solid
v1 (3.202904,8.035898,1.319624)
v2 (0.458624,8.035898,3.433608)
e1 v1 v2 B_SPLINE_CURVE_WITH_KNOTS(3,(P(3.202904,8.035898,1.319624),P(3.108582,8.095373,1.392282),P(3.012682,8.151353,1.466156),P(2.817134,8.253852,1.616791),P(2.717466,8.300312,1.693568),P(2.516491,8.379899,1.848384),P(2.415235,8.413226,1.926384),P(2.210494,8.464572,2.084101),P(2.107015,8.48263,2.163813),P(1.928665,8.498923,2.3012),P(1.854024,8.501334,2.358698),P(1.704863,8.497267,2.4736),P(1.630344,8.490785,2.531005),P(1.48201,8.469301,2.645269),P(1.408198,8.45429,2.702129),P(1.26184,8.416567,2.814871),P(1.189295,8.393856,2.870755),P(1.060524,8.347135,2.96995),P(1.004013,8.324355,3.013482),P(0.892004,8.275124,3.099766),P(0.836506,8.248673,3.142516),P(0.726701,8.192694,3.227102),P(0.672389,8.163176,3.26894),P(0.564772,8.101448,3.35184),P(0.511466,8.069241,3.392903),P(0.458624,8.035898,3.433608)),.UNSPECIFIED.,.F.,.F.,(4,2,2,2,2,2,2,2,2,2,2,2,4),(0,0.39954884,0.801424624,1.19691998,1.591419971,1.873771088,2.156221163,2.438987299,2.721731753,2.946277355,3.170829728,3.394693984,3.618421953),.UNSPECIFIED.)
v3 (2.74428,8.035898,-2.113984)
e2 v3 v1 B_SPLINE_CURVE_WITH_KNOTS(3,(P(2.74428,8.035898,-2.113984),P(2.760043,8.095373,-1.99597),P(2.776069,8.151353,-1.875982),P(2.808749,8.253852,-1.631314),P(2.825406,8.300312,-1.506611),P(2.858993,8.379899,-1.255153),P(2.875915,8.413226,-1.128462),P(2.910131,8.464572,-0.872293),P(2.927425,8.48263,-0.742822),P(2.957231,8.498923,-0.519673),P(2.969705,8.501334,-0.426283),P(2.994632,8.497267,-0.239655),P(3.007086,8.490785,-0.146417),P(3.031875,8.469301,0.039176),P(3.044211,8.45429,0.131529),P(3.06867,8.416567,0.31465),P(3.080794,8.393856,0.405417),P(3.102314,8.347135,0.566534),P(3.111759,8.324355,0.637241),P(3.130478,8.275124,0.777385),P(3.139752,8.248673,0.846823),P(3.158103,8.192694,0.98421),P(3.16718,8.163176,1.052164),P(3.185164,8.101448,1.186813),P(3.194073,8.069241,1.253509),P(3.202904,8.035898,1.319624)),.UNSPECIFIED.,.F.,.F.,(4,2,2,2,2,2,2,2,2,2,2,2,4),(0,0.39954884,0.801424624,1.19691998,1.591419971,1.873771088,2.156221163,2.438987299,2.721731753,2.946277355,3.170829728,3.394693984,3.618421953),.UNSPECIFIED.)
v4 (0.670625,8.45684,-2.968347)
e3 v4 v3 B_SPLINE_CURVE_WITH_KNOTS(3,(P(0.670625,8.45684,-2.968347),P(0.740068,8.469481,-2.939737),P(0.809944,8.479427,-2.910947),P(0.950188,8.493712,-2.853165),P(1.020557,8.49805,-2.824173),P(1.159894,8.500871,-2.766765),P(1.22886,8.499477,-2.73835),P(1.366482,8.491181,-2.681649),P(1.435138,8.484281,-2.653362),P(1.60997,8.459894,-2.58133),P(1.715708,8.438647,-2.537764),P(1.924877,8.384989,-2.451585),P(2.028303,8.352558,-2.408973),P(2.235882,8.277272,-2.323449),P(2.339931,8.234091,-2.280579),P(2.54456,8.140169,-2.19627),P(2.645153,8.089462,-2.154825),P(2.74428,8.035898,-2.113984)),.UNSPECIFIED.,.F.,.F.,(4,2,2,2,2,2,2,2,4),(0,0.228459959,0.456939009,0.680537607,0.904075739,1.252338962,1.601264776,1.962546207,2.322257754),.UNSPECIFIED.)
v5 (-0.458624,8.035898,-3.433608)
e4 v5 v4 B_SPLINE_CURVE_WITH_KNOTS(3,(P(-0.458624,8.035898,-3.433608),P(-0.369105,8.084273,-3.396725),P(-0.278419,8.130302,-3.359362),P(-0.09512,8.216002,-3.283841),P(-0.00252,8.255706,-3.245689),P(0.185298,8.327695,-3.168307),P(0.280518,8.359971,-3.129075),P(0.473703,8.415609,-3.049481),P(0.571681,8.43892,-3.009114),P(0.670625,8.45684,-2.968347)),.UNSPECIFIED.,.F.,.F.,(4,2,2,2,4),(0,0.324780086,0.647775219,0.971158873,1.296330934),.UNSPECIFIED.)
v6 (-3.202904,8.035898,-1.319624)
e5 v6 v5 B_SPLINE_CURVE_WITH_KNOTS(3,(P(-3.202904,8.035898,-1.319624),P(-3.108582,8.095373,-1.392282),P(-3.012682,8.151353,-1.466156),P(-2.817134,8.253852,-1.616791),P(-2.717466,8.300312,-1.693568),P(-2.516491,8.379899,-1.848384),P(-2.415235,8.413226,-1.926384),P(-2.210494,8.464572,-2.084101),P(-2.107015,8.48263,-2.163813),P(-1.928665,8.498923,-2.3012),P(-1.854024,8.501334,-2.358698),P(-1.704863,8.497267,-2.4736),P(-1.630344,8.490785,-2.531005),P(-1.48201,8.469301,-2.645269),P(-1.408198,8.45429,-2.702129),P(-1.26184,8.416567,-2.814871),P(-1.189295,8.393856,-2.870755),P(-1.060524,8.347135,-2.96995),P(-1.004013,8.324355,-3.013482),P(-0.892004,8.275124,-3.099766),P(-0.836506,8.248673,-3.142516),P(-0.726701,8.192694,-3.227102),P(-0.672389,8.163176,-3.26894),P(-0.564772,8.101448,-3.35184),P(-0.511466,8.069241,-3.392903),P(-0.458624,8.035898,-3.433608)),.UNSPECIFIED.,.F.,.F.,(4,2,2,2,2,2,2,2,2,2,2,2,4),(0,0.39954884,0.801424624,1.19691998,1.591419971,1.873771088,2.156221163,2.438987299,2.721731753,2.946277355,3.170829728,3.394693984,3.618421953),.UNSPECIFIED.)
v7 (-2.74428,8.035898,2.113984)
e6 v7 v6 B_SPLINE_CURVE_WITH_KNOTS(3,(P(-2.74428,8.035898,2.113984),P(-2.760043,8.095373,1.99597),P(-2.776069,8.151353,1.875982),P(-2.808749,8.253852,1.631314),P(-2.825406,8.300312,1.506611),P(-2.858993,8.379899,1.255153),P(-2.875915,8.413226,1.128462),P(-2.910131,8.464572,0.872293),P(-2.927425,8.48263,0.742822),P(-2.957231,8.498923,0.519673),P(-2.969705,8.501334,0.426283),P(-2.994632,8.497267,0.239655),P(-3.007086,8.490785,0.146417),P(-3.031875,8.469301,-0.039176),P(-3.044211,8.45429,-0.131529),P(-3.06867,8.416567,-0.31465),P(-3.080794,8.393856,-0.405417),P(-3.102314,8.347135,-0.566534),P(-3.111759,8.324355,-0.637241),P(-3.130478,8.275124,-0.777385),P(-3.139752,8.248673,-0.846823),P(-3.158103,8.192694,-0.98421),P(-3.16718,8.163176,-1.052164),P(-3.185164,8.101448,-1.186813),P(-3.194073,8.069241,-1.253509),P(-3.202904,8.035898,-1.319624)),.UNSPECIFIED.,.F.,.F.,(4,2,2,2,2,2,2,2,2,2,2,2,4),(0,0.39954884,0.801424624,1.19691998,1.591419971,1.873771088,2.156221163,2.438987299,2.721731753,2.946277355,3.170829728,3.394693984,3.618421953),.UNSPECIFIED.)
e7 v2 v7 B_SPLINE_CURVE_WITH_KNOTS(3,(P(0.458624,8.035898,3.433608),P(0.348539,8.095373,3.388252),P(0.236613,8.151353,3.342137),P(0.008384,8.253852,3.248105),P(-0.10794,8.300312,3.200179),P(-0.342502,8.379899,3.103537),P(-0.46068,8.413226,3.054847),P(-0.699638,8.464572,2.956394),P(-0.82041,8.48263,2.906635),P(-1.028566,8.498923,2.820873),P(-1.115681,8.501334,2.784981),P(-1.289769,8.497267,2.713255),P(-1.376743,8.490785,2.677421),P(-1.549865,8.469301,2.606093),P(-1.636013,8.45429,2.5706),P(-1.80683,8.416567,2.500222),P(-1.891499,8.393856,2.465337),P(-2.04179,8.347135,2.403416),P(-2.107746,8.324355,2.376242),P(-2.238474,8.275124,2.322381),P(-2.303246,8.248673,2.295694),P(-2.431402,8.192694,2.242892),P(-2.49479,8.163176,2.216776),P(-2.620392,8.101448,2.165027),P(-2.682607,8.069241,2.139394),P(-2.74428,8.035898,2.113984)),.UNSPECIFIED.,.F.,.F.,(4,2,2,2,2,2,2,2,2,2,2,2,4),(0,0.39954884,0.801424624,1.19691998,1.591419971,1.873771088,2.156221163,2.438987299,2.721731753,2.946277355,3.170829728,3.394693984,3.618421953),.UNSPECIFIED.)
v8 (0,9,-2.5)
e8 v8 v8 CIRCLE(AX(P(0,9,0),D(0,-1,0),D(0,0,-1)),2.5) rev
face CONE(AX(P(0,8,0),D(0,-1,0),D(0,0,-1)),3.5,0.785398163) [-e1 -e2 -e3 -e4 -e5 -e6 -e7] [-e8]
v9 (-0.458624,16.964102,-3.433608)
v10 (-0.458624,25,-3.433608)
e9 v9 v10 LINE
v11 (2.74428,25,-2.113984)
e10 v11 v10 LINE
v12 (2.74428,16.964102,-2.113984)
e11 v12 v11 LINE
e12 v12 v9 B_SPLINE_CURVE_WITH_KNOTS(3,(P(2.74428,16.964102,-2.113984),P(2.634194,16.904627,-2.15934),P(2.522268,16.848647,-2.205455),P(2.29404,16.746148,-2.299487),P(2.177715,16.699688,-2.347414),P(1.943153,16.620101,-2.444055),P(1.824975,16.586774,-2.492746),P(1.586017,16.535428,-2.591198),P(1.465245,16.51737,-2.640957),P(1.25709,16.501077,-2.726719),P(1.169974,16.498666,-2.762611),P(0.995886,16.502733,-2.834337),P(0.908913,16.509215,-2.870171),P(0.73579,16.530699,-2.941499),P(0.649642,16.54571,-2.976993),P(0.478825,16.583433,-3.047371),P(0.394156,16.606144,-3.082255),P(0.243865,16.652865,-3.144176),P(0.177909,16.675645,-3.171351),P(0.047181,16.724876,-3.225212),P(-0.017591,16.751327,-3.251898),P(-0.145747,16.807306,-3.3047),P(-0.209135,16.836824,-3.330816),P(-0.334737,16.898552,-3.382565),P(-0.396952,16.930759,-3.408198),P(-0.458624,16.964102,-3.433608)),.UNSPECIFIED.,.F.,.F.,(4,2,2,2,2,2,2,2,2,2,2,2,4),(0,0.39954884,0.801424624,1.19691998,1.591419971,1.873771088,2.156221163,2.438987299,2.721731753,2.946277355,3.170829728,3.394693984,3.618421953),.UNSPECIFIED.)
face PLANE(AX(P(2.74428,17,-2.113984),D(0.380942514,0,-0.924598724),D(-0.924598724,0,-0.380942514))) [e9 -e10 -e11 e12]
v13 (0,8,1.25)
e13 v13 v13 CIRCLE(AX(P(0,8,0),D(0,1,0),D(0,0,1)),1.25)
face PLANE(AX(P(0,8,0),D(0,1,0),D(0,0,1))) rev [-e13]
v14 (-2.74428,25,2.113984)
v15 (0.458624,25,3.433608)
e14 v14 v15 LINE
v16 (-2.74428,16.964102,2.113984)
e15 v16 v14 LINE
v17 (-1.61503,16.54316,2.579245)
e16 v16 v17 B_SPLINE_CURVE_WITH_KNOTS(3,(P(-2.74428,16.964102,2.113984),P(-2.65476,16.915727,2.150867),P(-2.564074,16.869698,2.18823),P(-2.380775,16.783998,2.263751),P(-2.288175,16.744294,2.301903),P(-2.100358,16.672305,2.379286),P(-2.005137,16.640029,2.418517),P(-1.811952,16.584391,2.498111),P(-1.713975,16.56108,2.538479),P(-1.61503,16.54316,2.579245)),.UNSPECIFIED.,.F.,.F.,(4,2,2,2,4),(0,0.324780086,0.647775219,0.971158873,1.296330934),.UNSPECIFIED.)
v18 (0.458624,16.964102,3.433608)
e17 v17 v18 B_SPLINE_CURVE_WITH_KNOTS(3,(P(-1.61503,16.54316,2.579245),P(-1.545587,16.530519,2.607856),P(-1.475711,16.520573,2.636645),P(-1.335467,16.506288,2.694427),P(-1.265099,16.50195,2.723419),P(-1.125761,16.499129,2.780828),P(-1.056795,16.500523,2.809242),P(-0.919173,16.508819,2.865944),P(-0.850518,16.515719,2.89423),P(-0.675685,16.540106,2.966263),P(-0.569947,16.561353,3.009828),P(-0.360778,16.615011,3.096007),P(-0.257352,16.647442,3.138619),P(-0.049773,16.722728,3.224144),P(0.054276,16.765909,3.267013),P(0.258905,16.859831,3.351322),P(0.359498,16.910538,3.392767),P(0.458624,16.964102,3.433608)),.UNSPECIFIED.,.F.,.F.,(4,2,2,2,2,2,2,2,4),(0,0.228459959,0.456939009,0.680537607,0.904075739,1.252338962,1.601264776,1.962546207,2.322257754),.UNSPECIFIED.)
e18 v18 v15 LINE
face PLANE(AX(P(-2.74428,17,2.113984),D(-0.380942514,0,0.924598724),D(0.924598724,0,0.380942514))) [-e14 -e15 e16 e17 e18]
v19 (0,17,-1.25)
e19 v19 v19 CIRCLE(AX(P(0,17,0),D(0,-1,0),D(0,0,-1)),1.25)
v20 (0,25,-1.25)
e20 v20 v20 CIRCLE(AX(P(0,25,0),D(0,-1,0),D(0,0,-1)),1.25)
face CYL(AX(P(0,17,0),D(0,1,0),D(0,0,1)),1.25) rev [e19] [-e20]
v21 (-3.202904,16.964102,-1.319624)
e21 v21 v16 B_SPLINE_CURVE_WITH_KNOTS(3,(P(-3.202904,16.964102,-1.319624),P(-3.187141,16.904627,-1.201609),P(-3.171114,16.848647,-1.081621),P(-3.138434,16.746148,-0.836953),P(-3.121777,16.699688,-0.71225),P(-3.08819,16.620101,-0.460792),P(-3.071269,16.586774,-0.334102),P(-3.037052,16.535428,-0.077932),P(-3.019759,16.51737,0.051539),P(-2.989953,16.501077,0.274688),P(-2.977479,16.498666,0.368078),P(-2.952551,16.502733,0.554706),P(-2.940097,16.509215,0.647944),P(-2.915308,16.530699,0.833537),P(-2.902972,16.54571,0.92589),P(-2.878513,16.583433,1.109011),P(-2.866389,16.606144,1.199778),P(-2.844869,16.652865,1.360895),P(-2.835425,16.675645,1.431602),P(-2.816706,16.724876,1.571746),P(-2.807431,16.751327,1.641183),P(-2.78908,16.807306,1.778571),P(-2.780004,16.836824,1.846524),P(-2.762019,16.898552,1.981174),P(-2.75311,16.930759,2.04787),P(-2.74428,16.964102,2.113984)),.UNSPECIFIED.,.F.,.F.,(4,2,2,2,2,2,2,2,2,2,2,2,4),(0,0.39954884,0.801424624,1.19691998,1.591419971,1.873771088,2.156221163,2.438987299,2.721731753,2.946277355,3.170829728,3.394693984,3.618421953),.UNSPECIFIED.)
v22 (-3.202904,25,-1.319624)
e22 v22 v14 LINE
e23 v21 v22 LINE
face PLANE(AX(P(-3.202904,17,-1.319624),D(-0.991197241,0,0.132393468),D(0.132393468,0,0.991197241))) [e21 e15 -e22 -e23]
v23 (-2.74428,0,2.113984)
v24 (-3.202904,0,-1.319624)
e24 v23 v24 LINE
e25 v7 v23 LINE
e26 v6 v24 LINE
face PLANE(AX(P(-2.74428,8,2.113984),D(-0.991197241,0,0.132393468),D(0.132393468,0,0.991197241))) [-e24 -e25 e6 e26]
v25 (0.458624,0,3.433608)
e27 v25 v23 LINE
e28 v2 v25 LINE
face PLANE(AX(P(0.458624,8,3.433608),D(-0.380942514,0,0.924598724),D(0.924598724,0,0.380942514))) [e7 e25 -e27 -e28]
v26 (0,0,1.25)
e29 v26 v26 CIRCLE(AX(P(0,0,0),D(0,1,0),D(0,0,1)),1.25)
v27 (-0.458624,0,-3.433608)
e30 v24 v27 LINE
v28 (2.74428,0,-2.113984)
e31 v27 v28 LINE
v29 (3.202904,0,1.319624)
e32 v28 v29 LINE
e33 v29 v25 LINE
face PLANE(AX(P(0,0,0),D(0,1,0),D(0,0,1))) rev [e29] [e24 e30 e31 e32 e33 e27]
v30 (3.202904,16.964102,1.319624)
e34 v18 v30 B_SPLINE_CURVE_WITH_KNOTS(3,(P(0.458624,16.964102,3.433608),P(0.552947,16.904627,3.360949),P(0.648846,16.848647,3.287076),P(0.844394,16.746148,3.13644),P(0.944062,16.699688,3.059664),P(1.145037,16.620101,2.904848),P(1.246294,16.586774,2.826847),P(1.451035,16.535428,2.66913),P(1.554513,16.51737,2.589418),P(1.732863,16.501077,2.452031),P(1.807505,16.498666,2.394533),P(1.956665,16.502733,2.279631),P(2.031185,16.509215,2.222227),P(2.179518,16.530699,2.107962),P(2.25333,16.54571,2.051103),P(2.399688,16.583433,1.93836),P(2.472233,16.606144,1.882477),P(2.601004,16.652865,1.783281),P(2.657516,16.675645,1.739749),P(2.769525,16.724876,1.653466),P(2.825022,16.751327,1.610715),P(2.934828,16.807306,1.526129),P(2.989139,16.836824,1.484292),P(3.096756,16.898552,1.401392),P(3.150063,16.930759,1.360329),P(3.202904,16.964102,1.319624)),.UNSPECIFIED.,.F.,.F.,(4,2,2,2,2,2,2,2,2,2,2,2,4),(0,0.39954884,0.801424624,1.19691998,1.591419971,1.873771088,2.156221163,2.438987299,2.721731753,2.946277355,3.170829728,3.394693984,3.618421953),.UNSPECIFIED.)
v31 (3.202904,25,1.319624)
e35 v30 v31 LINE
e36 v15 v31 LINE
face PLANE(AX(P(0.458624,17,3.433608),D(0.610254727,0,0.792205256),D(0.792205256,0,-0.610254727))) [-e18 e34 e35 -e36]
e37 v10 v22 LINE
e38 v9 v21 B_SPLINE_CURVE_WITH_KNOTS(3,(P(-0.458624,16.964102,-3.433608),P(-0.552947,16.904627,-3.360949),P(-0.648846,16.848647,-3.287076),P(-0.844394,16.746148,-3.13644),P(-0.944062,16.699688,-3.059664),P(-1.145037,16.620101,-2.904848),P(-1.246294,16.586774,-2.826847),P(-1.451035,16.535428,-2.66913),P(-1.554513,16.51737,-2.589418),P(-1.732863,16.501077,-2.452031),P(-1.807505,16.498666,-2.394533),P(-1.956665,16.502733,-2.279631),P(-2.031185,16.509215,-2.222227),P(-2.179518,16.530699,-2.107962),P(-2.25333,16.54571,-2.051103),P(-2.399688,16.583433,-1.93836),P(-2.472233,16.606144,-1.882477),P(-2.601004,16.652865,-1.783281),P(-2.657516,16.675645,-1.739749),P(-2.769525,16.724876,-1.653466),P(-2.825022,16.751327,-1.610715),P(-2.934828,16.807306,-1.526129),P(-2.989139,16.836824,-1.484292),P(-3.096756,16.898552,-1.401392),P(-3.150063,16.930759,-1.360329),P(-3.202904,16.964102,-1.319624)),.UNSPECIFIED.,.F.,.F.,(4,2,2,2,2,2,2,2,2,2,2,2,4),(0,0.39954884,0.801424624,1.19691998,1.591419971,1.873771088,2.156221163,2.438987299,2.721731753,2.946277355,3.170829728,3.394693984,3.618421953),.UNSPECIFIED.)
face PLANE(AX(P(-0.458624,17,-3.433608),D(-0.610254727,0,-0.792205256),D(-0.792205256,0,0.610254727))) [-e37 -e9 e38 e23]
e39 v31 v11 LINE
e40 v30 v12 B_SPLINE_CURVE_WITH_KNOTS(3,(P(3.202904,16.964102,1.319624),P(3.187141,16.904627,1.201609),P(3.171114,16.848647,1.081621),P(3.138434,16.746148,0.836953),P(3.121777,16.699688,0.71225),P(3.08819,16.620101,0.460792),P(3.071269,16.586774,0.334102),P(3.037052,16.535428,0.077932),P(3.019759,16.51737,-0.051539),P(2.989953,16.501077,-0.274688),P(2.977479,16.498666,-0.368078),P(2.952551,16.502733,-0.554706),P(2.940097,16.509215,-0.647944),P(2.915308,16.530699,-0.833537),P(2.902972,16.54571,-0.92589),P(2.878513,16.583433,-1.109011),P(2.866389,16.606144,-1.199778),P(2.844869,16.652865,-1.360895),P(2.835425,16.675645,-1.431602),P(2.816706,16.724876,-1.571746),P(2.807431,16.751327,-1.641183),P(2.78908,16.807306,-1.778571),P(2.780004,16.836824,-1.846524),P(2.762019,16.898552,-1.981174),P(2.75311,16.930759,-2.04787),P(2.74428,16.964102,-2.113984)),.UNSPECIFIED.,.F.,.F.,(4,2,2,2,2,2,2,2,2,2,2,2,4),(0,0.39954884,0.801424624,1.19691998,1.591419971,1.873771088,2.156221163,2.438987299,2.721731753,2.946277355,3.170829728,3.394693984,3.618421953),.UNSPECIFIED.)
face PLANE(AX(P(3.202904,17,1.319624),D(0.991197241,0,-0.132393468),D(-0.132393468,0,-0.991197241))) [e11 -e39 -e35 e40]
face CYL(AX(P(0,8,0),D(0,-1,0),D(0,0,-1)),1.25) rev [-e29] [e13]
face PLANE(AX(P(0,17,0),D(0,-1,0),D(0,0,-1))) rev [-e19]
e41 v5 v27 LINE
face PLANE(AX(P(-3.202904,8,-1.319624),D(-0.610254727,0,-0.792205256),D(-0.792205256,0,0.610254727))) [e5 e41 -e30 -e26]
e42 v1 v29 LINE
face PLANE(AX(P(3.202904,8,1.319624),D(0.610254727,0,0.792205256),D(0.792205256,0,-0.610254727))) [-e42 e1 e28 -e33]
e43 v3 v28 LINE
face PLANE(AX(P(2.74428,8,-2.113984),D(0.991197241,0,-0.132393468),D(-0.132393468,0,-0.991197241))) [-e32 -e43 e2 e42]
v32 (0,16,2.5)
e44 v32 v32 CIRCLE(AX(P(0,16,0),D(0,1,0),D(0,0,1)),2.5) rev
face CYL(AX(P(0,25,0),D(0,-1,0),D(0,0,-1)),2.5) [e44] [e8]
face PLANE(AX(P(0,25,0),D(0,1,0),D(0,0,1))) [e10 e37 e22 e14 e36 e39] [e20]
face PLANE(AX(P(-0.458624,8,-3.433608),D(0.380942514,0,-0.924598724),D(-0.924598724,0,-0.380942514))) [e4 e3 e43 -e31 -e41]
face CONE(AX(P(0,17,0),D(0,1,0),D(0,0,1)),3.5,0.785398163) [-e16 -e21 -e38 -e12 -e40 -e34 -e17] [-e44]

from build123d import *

# Parameters (mm, degrees)
SKETCH_1_R          = 2.5
EXTRUDE_1_DEPTH     = 25
EXTRUDE_2_DEPTH     = 8
EXTRUDE_3_DEPTH     = 8
CHAMFER_1_SIZE      = 1
SKETCH_4_R          = 1.25
CUT_EXTRUDE_1_DEPTH = 8
CUT_EXTRUDE_START   = 8
SKETCH_5_R          = 1.25
CUT_EXTRUDE_2_DEPTH = 8


with BuildPart() as part:
    # 草图1 → 凸台-拉伸1 (new body)
    with BuildSketch(Plane(origin=(0, 0, 0), x_dir=(1, 0, 0), z_dir=(0, 1, 0))):
        with Locations(Location((0, 0, 0), (0, 0, 270))):
            Circle(SKETCH_1_R)
    extrude(amount=EXTRUDE_1_DEPTH)

    # 草图2 → 凸台-拉伸2 (add)
    with BuildSketch(Plane(origin=(0, 25, 0), x_dir=(1, 0, 0), z_dir=(0, 1, 0))):
        Polygon((3.202903935, -1.319623577), (2.744279509, 2.113984385), (-0.458624426, 3.433607962), (-3.202903935, 1.319623577), (-2.744279509, -2.113984385), (0.458624426, -3.433607962), align=None)
    extrude(amount=-EXTRUDE_2_DEPTH)

    # 草图3 → 凸台-拉伸3 (add)
    with BuildSketch(Plane.XZ):
        Polygon((3.202903935, 1.319623577), (0.458624426, 3.433607962), (-2.744279509, 2.113984385), (-3.202903935, -1.319623577), (-0.458624426, -3.433607962), (2.744279509, -2.113984385), align=None)
    extrude(amount=-EXTRUDE_3_DEPTH)

    # 倒角1
    # the kernel refuses this chamfer: 1 mm, written as the material it adds along each edge
    with BuildSketch(Plane(origin=(0, 17, 0), x_dir=(0, 0, 1), z_dir=(1, 0, 0))) as chamfer_1_piece_1_section:
        Polygon((2.5, CHAMFER_1_SIZE), (2.5 + CHAMFER_1_SIZE, 0), (2.5, 0), align=None)
    chamfer_1_piece_1 = revolve(axis=Axis((0, 17, 0), (0, -1, 0)), mode=Mode.PRIVATE)
    chamfer_1_piece_1 = split(chamfer_1_piece_1, bisect_by=Plane(origin=(2.585980682, 16.482096178, -3.299128656), z_dir=(-0.9911972405355005, 0, 0.13239346794615373)), keep=Keep.TOP, mode=Mode.PRIVATE)
    chamfer_1_piece_1 = split(chamfer_1_piece_1, bisect_by=Plane(origin=(3.258731824, 16.482096178, 1.276618014), z_dir=(-0.61025472680424, 0, -0.7922052564917015)), keep=Keep.TOP, mode=Mode.PRIVATE)
    chamfer_1_piece_1 = split(chamfer_1_piece_1, bisect_by=Plane(origin=(0.102470937, 16.482096178, -3.202431915), z_dir=(-0.3809425137312606, 0, 0.924598724437855)), keep=Keep.TOP, mode=Mode.PRIVATE)
    chamfer_1_piece_1 = split(chamfer_1_piece_1, bisect_by=Plane(origin=(-2.183184145, 16.482096178, 2.345160432), z_dir=(0.38094251373126053, 0, -0.924598724437855)), keep=Keep.TOP, mode=Mode.PRIVATE)
    chamfer_1_piece_1 = split(chamfer_1_piece_1, bisect_by=Plane(origin=(-0.402796537, 16.482096178, -3.476613525), z_dir=(0.6102547268042401, 0, 0.7922052564917015)), keep=Keep.TOP, mode=Mode.PRIVATE)
    chamfer_1_piece_1 = split(chamfer_1_piece_1, bisect_by=Plane(origin=(-3.361202761, 16.482096178, -2.504767848), z_dir=(0.9911972405355005, 0, -0.1323934679461537)), keep=Keep.TOP, mode=Mode.PRIVATE)
    add(chamfer_1_piece_1)
    with BuildSketch(Plane(origin=(0, 8, 0), x_dir=(0, 0, 1), z_dir=(1, 0, 0))) as chamfer_1_piece_2_section:
        Polygon((2.5 + CHAMFER_1_SIZE, 0), (2.5, -CHAMFER_1_SIZE), (2.5, 0), align=None)
    chamfer_1_piece_2 = revolve(axis=Axis((0, 8, 0), (0, -1, 0)), mode=Mode.PRIVATE)
    chamfer_1_piece_2 = split(chamfer_1_piece_2, bisect_by=Plane(origin=(3.258731824, 8.517903822, 1.276618014), z_dir=(-0.61025472680424, 0, -0.7922052564917015)), keep=Keep.TOP, mode=Mode.PRIVATE)
    chamfer_1_piece_2 = split(chamfer_1_piece_2, bisect_by=Plane(origin=(2.585980682, 8.517903822, -3.299128656), z_dir=(-0.9911972405355005, 0, 0.13239346794615373)), keep=Keep.TOP, mode=Mode.PRIVATE)
    chamfer_1_piece_2 = split(chamfer_1_piece_2, bisect_by=Plane(origin=(-2.183184145, 8.517903822, 2.345160432), z_dir=(0.38094251373126053, 0, -0.924598724437855)), keep=Keep.TOP, mode=Mode.PRIVATE)
    chamfer_1_piece_2 = split(chamfer_1_piece_2, bisect_by=Plane(origin=(0.102470937, 8.517903822, -3.202431915), z_dir=(-0.3809425137312606, 0, 0.924598724437855)), keep=Keep.TOP, mode=Mode.PRIVATE)
    chamfer_1_piece_2 = split(chamfer_1_piece_2, bisect_by=Plane(origin=(-3.361202761, 8.517903822, -2.504767848), z_dir=(0.9911972405355005, 0, -0.1323934679461537)), keep=Keep.TOP, mode=Mode.PRIVATE)
    chamfer_1_piece_2 = split(chamfer_1_piece_2, bisect_by=Plane(origin=(-0.402796537, 8.517903822, -3.476613525), z_dir=(0.6102547268042401, 0, 0.7922052564917015)), keep=Keep.TOP, mode=Mode.PRIVATE)
    add(chamfer_1_piece_2)

    # 草图4 → 切除-拉伸1 (cut)
    with BuildSketch(Plane(origin=(0, 0, 0), x_dir=(-1, 0, 0), z_dir=(0, 1, 0))):
        with Locations(Location((0, 0, 0), (0, 0, 90))):
            Circle(SKETCH_4_R)
    extrude(amount=CUT_EXTRUDE_1_DEPTH, mode=Mode.SUBTRACT)

    # 草图5 → 切除-拉伸2 (cut)
    with BuildSketch(Plane(origin=(0, 25, 0), x_dir=(-1, 0, 0), z_dir=(0, -1, 0)).offset(CUT_EXTRUDE_START)):
        with Locations(Location((0, 0, 0), (0, 0, 270))):
            Circle(SKETCH_5_R)
    extrude(amount=-CUT_EXTRUDE_2_DEPTH, mode=Mode.SUBTRACT)


solid = part.part
